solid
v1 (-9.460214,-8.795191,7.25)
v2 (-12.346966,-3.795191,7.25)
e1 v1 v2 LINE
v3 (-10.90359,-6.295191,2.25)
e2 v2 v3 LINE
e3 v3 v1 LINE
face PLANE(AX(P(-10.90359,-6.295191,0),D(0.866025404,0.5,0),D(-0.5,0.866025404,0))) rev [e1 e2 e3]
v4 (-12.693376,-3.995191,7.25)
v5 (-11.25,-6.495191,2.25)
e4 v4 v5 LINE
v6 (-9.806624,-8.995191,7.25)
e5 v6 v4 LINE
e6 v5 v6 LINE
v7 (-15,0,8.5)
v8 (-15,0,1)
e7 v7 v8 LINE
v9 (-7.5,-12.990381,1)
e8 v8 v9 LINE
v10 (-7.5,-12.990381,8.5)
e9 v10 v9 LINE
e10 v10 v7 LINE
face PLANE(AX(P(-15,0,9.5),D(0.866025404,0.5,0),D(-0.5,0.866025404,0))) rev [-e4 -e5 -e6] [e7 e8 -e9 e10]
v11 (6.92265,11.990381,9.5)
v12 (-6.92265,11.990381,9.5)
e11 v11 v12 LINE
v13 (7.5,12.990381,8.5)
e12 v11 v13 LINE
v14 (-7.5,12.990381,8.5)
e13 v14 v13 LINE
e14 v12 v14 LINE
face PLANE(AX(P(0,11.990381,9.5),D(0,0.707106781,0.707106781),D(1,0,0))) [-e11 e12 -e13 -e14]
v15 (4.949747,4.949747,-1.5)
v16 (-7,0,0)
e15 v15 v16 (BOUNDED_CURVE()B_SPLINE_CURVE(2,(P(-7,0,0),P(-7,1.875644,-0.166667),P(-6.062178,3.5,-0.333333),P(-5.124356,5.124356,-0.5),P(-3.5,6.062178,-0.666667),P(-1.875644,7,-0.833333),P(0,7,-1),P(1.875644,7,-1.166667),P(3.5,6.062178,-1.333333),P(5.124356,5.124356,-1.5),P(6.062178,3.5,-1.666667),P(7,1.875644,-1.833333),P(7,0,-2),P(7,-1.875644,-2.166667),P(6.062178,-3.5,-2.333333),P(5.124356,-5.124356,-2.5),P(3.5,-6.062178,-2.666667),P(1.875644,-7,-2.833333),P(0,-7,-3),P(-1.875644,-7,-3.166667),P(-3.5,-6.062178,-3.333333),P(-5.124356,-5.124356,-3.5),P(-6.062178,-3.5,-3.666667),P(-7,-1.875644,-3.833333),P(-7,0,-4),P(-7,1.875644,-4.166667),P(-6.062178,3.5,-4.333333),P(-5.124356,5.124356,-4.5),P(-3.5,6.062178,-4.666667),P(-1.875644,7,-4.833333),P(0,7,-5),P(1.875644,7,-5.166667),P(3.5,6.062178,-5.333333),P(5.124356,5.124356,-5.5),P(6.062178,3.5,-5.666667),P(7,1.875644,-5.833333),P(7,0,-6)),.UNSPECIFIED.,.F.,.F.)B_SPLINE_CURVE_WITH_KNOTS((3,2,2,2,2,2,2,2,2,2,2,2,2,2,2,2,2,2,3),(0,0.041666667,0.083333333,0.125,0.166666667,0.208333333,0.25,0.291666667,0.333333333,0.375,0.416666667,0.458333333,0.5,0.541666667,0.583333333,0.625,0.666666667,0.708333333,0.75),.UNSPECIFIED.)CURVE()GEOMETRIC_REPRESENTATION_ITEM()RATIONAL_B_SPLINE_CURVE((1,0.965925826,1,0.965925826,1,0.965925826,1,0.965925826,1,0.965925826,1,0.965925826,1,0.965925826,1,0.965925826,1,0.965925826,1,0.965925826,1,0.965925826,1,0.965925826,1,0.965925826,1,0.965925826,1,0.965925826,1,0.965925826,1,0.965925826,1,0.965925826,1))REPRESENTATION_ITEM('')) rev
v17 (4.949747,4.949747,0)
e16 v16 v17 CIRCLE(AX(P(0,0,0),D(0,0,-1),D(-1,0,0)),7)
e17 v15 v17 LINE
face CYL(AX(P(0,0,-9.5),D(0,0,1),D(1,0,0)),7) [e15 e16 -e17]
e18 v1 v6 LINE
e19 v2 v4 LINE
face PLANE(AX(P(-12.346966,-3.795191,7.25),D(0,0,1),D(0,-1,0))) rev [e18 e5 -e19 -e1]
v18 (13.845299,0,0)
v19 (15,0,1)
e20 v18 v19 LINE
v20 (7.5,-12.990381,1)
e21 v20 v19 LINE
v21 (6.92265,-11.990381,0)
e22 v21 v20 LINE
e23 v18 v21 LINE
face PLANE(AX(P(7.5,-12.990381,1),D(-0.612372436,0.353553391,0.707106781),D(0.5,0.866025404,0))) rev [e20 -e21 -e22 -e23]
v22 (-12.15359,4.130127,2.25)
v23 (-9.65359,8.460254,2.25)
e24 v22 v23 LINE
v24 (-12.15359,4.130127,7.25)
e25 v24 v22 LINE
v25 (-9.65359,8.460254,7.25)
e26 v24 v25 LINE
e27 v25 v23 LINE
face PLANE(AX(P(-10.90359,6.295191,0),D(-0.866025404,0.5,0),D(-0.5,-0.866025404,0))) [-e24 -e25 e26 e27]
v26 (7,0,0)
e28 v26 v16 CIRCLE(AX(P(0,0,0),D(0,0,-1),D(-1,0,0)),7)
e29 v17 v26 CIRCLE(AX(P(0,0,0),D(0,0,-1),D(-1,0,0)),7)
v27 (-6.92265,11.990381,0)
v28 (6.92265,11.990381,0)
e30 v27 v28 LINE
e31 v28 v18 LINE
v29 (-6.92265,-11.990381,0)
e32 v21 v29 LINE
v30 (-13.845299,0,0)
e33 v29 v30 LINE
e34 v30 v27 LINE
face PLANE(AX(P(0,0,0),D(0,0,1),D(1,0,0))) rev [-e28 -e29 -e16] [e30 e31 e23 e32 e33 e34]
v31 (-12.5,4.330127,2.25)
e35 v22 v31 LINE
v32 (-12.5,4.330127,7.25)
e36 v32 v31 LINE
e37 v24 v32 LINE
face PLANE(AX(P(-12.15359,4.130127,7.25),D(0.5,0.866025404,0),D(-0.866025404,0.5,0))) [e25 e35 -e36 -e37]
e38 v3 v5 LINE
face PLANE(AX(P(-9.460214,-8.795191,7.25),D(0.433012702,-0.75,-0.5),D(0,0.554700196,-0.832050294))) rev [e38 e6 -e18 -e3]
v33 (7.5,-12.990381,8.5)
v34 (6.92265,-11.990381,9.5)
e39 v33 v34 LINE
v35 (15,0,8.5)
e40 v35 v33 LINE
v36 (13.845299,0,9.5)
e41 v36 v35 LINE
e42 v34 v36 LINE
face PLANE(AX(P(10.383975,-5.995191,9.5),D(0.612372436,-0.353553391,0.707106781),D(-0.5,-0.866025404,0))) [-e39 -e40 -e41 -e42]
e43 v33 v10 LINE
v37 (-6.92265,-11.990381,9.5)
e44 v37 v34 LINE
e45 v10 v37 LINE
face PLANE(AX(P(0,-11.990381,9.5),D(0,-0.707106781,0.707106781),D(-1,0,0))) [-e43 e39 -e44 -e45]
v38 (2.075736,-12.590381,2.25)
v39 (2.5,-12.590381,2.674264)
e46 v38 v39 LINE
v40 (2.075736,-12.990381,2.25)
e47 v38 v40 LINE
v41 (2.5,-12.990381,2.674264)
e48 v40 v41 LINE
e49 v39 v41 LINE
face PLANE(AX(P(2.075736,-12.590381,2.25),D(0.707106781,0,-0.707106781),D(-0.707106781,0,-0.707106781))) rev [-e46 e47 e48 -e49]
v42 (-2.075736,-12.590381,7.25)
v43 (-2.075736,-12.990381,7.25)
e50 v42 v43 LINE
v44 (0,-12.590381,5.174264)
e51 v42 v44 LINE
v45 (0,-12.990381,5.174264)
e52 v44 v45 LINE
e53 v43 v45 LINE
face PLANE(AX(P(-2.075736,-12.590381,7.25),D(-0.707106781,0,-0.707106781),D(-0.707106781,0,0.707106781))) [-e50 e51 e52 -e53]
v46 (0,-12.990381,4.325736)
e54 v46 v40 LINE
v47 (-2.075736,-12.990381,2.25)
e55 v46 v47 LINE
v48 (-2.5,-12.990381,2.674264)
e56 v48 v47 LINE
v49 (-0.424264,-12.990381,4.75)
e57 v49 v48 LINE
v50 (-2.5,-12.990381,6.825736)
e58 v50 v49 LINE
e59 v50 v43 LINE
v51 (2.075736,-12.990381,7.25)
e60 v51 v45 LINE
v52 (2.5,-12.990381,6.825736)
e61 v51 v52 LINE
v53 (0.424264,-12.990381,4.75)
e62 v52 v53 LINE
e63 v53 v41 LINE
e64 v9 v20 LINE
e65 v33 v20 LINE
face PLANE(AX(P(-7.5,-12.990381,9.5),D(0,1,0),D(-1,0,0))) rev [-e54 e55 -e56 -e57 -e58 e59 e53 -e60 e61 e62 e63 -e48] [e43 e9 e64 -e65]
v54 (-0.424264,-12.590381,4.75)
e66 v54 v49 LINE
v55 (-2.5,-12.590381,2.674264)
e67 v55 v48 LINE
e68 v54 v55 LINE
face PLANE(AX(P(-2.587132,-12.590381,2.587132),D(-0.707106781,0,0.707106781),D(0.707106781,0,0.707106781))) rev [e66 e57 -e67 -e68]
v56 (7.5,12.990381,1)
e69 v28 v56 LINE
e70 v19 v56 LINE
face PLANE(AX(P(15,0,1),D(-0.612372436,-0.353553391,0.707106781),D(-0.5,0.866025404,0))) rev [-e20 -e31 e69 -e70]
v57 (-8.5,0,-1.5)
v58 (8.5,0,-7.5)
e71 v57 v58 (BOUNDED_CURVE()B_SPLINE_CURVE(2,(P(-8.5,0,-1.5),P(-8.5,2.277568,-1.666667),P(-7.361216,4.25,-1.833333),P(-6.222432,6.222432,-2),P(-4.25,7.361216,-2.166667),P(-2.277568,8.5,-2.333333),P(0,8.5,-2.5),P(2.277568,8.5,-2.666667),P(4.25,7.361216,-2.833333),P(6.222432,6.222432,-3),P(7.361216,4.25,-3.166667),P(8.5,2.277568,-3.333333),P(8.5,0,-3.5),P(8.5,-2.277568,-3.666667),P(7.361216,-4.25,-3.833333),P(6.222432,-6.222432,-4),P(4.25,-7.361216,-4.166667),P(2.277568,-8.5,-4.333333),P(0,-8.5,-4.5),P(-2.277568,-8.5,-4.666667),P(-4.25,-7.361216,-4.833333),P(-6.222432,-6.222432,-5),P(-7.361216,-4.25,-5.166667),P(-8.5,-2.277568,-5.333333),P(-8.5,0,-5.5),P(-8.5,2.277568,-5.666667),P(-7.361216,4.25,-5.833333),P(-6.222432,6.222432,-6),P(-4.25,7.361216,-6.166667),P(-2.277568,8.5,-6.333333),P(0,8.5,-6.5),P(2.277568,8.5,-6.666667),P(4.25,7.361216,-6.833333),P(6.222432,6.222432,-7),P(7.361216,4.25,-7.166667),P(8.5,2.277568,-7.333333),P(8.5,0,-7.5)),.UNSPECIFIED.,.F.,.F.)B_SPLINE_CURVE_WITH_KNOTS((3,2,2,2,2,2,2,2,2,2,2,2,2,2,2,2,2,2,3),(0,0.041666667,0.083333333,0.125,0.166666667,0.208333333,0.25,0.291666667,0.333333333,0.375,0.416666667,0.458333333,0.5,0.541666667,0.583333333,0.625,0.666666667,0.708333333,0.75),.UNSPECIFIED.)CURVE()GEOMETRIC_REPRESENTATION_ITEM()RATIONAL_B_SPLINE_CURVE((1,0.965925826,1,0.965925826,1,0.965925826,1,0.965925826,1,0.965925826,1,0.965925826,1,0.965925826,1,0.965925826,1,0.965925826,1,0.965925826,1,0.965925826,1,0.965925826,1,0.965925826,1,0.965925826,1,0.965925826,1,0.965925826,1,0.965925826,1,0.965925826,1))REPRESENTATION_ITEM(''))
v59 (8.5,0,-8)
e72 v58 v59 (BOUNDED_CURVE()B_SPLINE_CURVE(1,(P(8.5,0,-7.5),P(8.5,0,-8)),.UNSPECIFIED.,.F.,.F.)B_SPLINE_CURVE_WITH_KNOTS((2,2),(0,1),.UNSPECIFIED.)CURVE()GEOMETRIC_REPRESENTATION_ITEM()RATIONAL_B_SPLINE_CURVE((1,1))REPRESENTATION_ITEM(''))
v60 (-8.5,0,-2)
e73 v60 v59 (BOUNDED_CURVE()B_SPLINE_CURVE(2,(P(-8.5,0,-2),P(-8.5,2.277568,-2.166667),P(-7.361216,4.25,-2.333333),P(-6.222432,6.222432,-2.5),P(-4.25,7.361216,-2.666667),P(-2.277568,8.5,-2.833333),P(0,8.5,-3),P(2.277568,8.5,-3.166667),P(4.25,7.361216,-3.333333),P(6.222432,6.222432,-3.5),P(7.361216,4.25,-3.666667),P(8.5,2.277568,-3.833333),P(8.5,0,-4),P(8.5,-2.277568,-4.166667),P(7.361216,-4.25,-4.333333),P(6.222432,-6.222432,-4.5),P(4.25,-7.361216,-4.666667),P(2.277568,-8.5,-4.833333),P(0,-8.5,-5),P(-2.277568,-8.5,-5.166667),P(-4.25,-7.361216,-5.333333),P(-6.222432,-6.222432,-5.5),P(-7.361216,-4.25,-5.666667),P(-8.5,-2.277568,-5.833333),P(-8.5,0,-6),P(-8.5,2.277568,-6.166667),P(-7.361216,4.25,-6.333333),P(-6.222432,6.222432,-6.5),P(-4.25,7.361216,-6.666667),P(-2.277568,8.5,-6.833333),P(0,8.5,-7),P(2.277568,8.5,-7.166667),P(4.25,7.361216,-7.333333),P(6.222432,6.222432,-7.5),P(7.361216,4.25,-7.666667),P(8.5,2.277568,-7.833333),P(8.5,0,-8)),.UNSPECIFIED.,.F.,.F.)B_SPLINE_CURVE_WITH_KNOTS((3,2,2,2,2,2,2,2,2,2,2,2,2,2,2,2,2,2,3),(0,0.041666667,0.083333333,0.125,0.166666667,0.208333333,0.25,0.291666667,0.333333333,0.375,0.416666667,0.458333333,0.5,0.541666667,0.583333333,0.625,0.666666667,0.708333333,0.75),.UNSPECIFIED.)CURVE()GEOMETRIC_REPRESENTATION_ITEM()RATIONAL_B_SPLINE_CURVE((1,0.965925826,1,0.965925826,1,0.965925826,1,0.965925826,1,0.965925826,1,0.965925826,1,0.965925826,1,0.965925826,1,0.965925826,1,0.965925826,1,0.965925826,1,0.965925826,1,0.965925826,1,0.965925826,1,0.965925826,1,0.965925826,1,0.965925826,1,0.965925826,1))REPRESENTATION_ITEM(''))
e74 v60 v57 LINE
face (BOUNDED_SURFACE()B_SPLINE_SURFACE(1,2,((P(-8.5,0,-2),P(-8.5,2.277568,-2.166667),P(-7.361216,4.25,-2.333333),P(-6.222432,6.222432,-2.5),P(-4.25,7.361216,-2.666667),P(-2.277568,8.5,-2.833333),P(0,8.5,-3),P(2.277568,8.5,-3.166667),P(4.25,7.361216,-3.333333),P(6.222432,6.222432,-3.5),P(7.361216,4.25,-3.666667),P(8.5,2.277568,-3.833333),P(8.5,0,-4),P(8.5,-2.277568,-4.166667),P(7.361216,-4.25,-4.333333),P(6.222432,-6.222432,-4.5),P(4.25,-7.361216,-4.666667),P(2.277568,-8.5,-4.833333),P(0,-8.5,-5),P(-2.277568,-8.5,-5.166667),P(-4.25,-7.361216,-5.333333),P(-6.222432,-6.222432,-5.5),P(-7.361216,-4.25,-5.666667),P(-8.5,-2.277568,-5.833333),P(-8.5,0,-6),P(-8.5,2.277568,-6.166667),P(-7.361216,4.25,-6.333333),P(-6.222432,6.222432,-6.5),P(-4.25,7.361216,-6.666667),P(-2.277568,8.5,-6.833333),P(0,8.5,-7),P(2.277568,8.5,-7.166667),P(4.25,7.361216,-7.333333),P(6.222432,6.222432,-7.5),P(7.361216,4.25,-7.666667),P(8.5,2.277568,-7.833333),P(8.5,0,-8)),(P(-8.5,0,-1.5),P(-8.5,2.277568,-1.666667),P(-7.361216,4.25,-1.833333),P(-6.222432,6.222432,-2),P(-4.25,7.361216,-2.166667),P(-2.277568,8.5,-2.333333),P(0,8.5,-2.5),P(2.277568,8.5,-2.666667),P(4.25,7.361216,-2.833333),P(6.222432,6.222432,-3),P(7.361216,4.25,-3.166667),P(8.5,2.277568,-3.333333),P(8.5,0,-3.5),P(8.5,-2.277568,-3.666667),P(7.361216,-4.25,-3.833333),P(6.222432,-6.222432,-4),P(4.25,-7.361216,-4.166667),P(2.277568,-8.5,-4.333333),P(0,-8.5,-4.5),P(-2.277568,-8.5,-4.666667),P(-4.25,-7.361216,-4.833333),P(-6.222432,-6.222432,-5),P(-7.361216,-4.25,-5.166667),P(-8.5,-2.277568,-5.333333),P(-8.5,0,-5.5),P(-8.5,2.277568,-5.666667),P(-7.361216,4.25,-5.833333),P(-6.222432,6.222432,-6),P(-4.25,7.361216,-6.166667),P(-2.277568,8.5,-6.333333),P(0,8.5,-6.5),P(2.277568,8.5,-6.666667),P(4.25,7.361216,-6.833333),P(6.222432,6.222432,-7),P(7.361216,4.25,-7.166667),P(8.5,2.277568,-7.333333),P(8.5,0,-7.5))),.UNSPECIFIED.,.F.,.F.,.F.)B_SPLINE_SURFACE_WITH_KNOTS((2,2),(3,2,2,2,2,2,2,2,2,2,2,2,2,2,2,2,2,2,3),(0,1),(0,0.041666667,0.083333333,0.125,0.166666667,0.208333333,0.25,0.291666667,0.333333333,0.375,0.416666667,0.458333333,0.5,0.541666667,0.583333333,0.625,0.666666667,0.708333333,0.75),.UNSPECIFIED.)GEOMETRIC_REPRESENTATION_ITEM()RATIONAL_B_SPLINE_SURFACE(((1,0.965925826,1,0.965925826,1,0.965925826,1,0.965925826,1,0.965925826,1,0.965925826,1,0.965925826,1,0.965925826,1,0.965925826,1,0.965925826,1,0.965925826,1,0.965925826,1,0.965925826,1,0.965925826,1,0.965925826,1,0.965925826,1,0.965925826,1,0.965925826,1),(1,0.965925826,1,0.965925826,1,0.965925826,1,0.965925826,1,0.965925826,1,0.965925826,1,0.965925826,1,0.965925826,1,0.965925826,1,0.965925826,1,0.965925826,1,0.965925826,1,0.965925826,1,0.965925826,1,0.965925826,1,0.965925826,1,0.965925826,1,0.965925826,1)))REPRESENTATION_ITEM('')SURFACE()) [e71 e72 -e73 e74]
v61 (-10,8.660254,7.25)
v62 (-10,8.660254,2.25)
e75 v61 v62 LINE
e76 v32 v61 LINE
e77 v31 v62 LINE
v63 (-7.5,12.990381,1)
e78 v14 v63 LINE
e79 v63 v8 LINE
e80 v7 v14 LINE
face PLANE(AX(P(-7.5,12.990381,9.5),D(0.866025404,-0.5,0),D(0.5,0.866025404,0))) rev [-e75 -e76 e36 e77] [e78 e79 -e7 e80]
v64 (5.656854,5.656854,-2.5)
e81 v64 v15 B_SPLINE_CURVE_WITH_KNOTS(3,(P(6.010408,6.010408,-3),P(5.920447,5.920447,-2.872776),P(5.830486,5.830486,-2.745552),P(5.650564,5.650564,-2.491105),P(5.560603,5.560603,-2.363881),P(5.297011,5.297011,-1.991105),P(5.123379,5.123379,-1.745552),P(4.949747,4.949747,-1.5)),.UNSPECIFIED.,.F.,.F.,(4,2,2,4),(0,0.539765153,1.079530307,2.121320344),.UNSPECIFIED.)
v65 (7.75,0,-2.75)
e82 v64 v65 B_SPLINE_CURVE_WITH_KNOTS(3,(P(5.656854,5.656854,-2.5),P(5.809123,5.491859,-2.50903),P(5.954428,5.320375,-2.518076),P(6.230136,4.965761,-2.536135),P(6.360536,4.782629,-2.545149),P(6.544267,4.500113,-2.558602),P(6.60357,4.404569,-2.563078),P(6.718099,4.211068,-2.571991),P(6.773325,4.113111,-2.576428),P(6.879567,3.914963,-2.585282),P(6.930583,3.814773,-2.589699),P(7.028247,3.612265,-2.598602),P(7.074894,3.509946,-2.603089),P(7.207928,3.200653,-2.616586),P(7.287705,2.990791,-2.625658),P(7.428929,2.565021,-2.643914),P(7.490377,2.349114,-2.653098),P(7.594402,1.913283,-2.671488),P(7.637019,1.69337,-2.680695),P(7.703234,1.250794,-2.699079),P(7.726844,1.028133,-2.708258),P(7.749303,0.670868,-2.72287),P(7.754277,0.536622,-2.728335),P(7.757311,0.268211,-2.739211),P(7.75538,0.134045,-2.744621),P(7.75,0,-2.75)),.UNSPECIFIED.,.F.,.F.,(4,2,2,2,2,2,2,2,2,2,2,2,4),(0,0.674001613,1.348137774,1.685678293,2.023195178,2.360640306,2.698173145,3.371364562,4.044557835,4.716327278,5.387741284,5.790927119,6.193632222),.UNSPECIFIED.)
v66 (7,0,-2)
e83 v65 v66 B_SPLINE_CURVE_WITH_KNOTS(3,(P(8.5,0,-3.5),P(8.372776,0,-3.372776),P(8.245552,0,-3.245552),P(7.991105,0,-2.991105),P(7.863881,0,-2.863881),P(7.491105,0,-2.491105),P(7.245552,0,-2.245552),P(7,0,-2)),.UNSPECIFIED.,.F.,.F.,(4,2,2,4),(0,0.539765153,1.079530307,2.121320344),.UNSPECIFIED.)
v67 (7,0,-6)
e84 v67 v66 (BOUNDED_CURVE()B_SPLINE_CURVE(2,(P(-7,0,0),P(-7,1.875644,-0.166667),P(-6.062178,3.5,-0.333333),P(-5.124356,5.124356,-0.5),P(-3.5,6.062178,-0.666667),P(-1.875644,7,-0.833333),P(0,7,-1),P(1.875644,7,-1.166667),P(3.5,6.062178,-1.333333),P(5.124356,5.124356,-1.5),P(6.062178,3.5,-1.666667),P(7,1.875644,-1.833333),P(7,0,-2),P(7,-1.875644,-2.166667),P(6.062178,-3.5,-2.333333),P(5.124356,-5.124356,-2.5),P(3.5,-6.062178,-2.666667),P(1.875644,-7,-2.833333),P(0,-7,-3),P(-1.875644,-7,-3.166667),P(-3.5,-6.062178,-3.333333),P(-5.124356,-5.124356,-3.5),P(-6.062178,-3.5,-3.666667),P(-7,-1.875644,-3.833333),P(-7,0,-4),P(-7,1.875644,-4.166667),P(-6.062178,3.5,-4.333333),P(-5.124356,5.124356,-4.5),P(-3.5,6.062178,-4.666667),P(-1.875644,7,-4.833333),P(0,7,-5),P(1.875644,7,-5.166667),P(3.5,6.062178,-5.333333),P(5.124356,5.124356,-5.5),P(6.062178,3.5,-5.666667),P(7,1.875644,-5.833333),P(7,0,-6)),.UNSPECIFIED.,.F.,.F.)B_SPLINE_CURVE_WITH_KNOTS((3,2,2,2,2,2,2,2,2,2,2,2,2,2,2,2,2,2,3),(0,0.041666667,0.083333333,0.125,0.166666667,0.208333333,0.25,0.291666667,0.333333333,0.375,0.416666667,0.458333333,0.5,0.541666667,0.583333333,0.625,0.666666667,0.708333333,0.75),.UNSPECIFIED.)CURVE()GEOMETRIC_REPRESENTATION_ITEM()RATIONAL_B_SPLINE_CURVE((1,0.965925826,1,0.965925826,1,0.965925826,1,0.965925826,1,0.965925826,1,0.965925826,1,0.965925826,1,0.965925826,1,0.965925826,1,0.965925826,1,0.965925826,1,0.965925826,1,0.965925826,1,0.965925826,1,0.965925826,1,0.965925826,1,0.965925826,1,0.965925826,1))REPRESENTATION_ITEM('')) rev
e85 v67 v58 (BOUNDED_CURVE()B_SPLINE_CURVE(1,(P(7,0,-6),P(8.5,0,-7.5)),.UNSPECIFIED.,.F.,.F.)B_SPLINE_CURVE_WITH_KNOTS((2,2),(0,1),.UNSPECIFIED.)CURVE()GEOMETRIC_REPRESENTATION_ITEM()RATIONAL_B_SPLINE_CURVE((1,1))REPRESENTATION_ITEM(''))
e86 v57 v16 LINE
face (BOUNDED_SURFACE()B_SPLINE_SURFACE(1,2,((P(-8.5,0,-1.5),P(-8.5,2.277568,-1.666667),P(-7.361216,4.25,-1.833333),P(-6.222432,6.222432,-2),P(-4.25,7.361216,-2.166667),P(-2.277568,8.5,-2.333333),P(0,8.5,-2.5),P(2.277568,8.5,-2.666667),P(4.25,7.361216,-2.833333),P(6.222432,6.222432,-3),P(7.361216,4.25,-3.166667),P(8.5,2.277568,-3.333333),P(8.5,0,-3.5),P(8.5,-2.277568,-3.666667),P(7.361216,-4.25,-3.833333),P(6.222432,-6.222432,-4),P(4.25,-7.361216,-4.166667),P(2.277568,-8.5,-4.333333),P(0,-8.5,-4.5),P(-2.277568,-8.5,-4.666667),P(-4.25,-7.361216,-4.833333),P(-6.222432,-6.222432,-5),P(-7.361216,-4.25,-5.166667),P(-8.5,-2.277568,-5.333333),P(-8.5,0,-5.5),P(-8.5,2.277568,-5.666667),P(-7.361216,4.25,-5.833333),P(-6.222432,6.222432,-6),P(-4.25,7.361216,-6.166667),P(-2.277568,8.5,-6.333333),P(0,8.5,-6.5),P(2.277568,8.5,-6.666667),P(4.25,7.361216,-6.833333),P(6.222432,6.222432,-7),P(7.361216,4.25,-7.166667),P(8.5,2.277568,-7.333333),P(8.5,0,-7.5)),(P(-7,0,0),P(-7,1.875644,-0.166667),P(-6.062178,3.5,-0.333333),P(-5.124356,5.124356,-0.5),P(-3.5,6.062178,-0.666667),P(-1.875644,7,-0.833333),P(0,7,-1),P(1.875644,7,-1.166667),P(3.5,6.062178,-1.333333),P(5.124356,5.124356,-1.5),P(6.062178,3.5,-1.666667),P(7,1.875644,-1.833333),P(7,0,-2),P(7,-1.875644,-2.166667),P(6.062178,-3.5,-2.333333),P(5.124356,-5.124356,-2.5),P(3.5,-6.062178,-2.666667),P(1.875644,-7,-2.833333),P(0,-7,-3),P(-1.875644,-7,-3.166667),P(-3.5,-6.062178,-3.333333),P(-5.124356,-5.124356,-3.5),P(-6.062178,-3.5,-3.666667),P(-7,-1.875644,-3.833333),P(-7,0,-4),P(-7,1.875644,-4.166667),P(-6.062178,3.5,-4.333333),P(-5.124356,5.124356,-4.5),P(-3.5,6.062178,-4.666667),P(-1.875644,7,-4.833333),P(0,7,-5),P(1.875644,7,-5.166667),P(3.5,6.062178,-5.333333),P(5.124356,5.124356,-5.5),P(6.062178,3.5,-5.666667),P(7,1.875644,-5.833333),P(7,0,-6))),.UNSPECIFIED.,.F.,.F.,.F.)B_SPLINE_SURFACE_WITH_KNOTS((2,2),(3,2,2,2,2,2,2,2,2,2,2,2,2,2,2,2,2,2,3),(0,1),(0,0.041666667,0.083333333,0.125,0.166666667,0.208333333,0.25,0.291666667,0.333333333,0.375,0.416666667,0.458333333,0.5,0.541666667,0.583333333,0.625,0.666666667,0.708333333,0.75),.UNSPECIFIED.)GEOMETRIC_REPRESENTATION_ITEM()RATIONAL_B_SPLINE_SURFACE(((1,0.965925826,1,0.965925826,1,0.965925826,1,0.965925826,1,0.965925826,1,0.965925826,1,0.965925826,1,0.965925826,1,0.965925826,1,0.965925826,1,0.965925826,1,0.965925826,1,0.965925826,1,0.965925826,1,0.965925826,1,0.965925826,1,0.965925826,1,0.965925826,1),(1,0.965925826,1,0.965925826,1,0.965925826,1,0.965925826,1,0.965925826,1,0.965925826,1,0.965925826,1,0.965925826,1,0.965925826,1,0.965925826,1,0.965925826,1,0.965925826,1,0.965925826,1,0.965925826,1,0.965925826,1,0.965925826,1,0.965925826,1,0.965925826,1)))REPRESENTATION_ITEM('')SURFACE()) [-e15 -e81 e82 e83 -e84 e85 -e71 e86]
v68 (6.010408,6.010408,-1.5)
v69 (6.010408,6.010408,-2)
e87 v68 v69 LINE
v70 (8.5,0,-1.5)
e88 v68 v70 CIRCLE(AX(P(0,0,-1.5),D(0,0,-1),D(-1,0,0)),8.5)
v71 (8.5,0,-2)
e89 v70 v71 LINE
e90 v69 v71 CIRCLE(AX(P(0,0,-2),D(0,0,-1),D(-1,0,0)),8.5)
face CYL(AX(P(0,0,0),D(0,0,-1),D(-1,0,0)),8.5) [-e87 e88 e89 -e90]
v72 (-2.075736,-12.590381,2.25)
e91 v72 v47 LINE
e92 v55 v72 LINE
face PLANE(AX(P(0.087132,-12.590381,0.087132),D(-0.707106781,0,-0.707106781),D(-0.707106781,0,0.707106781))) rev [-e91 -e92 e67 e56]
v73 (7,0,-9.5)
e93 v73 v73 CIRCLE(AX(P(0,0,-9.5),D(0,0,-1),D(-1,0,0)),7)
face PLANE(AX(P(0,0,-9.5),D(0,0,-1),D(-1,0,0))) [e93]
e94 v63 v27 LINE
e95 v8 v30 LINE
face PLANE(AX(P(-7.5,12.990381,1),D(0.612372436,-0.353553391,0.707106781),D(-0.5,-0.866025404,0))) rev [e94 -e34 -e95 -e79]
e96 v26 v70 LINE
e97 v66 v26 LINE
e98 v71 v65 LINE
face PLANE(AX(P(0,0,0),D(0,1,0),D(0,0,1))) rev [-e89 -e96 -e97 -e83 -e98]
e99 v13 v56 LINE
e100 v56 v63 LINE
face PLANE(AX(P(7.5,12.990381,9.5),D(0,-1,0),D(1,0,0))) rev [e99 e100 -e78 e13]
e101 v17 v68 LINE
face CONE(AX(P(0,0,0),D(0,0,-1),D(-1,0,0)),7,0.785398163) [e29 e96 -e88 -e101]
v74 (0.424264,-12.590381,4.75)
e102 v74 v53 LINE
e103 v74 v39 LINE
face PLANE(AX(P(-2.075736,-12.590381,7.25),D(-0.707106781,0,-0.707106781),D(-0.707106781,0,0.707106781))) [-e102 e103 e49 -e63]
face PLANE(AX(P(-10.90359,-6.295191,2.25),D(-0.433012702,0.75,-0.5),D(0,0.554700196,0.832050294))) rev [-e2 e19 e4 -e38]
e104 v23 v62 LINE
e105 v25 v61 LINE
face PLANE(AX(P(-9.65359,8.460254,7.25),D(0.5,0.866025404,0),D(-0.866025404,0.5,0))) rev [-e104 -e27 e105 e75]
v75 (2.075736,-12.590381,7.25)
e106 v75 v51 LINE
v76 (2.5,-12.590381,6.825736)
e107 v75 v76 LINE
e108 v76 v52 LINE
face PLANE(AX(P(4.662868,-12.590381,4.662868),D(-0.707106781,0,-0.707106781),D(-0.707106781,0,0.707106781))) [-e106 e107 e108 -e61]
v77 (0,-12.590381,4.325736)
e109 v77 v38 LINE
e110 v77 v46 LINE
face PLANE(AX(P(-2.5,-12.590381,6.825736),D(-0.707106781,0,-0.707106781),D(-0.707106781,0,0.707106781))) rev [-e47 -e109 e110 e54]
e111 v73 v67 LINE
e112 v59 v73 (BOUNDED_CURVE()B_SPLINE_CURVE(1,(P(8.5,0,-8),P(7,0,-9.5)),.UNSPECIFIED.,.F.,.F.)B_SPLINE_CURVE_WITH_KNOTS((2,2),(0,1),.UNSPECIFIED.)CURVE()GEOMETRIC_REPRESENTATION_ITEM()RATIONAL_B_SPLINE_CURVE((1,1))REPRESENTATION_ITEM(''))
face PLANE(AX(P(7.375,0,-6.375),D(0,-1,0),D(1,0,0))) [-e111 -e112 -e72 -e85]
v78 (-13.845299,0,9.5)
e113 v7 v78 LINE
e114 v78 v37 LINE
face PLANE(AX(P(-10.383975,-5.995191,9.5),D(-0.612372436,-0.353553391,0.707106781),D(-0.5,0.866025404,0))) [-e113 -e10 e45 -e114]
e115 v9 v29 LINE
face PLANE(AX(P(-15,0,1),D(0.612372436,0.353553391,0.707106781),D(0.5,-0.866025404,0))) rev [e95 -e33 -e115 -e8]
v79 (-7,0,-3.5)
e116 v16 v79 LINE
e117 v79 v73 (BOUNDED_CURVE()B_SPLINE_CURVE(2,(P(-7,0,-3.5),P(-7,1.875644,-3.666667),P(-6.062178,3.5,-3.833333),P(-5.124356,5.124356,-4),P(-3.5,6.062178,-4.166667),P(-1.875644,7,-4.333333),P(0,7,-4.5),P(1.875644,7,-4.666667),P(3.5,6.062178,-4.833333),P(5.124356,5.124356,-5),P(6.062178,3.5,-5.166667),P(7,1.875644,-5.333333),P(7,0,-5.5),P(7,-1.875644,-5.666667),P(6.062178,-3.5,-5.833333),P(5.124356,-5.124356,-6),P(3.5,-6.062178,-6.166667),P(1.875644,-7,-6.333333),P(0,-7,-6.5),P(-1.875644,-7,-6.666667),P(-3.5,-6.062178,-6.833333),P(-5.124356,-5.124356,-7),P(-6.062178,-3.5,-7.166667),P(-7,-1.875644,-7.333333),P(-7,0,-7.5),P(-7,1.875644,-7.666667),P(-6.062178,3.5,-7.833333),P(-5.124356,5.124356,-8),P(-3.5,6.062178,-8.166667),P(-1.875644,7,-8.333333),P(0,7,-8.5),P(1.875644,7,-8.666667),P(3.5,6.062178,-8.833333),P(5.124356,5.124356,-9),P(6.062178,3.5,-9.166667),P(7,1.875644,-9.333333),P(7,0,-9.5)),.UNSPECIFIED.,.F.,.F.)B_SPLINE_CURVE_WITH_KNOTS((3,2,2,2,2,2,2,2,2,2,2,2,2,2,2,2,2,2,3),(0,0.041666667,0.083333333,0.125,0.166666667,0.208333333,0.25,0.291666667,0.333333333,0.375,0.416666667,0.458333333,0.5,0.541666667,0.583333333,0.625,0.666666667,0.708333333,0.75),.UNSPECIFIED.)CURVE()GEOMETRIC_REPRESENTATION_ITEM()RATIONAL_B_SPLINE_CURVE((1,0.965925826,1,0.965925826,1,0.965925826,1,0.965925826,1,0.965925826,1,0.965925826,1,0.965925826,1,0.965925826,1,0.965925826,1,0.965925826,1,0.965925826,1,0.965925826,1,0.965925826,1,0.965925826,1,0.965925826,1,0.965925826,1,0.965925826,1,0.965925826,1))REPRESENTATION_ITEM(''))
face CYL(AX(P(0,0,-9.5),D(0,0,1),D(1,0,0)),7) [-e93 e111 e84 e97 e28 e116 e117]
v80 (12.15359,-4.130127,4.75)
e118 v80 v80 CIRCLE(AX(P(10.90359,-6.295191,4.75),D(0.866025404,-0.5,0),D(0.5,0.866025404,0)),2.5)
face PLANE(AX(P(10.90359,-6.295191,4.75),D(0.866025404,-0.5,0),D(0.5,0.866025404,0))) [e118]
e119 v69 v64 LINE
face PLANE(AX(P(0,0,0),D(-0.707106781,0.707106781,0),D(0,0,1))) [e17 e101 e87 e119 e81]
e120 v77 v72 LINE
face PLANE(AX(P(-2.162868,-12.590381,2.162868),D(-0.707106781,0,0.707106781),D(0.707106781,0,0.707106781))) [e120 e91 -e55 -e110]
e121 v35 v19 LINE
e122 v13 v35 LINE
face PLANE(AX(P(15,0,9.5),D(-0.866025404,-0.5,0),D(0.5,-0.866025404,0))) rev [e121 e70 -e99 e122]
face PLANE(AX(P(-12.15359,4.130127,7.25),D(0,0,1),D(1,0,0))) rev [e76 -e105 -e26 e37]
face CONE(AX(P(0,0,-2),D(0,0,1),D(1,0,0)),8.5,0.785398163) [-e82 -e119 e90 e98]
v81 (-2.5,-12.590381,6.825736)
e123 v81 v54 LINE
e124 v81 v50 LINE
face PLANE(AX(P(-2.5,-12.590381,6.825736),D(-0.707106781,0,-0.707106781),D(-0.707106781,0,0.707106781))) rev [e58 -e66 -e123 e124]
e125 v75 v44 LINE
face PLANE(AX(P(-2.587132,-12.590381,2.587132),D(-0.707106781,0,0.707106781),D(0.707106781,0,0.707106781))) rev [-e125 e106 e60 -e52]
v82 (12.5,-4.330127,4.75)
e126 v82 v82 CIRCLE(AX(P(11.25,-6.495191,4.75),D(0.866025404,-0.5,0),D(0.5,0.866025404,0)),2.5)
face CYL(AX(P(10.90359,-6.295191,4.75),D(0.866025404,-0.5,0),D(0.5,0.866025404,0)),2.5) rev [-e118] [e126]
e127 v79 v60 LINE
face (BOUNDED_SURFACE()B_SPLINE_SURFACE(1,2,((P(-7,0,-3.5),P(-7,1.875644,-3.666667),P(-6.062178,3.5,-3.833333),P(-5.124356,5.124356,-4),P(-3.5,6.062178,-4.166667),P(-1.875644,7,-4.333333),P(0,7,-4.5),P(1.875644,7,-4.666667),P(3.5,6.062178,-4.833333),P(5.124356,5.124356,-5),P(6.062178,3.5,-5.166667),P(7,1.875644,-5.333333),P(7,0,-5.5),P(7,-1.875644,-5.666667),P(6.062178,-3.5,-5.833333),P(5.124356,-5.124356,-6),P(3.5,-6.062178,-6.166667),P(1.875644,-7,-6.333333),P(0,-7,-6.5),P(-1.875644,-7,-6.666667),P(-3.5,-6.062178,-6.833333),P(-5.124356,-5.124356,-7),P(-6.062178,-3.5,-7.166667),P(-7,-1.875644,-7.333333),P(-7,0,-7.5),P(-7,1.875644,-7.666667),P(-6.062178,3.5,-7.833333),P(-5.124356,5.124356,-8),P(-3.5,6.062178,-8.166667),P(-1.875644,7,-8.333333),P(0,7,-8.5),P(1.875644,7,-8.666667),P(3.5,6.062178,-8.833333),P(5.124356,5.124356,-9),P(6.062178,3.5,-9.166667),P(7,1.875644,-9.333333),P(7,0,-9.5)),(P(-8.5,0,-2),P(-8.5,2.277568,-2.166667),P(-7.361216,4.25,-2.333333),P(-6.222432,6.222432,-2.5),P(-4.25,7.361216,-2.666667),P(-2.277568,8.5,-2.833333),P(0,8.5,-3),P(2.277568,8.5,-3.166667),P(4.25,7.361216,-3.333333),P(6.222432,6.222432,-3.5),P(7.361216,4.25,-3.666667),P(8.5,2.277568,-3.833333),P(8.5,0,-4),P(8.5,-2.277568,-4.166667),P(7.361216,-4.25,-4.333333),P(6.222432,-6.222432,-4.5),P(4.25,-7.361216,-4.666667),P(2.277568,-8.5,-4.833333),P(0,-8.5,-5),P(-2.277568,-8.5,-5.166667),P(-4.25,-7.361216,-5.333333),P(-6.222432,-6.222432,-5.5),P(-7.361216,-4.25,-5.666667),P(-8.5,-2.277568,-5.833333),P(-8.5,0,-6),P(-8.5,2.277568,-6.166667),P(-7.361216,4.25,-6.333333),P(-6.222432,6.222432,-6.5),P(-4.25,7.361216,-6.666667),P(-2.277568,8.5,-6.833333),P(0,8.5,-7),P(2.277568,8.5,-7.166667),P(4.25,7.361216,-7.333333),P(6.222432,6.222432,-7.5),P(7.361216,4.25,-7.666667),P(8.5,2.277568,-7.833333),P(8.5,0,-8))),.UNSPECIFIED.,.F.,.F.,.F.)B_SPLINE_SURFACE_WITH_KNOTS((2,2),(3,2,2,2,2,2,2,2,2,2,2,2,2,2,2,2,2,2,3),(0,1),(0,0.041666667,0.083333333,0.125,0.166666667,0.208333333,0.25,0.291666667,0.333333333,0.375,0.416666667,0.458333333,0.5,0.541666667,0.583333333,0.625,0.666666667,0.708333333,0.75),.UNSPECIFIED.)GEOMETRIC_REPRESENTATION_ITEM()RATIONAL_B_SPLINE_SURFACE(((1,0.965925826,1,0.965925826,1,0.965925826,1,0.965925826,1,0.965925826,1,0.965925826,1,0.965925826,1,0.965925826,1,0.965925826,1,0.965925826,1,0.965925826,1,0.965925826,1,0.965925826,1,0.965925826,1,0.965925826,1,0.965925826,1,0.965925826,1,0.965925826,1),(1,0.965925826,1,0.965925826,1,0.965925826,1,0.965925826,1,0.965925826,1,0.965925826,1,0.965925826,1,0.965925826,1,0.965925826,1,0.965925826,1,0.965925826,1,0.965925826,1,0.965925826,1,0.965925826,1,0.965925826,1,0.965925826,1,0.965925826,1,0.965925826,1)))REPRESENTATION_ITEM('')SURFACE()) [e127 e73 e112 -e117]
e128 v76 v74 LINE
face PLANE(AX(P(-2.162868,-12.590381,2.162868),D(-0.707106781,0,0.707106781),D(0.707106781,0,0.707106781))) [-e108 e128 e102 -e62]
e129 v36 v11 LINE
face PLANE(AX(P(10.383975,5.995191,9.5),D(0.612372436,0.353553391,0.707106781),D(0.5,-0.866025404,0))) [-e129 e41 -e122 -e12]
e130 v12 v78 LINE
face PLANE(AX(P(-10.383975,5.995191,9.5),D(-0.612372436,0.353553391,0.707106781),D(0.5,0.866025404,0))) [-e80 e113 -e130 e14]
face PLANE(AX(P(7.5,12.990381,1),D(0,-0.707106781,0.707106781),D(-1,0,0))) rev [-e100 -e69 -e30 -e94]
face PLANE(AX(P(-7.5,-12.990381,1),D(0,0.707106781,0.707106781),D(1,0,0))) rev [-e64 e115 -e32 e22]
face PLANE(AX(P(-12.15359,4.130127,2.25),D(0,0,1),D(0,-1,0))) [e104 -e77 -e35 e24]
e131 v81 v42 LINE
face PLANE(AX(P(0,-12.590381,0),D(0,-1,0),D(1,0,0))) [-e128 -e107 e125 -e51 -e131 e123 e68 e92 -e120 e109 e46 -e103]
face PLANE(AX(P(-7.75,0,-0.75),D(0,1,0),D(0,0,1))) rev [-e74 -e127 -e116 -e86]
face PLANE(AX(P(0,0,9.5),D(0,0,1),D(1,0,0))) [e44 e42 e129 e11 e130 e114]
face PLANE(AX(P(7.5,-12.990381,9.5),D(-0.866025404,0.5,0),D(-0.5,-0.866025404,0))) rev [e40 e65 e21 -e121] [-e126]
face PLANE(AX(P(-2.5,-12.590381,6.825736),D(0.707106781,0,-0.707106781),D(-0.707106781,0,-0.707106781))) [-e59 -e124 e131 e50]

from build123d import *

# Parameters (mm, degrees)
EXTRUDE_1_DEPTH     = 9.5
SKETCH_6_R          = 7
EXTRUDE_2_DEPTH     = 9.5
SWEEP_1_PITCH       = 4
REVOLVE_2_ANGLE     = 45
CHAMFER_1_SIZE      = 1
CUT_EXTRUDE_2_DEPTH = 0.4
SKETCH_13_R         = 2.5
CUT_EXTRUDE_3_DEPTH = 0.4
CUT_EXTRUDE_4_DEPTH = 0.4
SKETCH_14_W         = 5
SKETCH_14_H         = 5
CUT_EXTRUDE_5_DEPTH = 0.4


with BuildPart() as part:
    # 草图1 → 凸台-拉伸1 (new body)
    with BuildSketch(Plane.XY):
        Polygon((15, 0), (7.5, 12.990381057), (-7.5, 12.990381057), (-15, 0), (-7.5, -12.990381057), (7.5, -12.990381057), align=None)
    extrude(amount=EXTRUDE_1_DEPTH)

    # 草图6 → 凸台-拉伸2 (add)
    with BuildSketch(Plane(origin=(0, 0, 0), x_dir=(-1, 0, 0), z_dir=(0, 0, -1))):
        Circle(SKETCH_6_R)
    extrude(amount=EXTRUDE_2_DEPTH)

    # 扫描1: the profile of 草图8 profile screwed along a right-hand helix of 1.5 turns, 12 arcs to a turn; built about Z, then put on its axis
    sweep_1_z = Axis((0, 0, 0), (0, 0, 1))
    sweep_1_corners = [(6.9997, 0, 1.7503), (6.9997, 0, -1.7503), (8.5, 0, -0.25), (8.5, 0, 0.25)]
    with BuildLine(mode=Mode.PRIVATE) as sweep_1_profile:
        Line(sweep_1_corners[0], sweep_1_corners[1])
        Line(sweep_1_corners[1], sweep_1_corners[2])
        Line(sweep_1_corners[2], sweep_1_corners[3])
        Line(sweep_1_corners[3], sweep_1_corners[0])
    sweep_1_cap = Face(sweep_1_profile.wire())
    sweep_1_turn_angles = [0, 15, 30, 45, 60, 75, 90, 105, 120, 135, 150, 165, 180, 195, 210, 225, 240, 255, 270, 285, 300, 315, 330, 345, 360]
    sweep_1_turn_weights = [1, 0.9659258262890683, 1, 0.9659258262890683, 1, 0.9659258262890683, 1, 0.9659258262890683, 1, 0.9659258262890683, 1, 0.9659258262890683, 1, 0.9659258262890683, 1, 0.9659258262890683, 1, 0.9659258262890683, 1, 0.9659258262890683, 1, 0.9659258262890683, 1, 0.9659258262890683, 1]
    sweep_1_turn_rails = [Edge.make_bspline([Vector(p[0], p[1], 0).rotate(sweep_1_z, sweep_1_turn_angles[k]) / sweep_1_turn_weights[k] + Vector(0, 0, p[2] + SWEEP_1_PITCH * sweep_1_turn_angles[k] / 360) for k in range(25)], [0, 0, 0, 1, 1, 2, 2, 3, 3, 4, 4, 5, 5, 6, 6, 7, 7, 8, 8, 9, 9, 10, 10, 11, 11, 12, 12, 12], 2, sweep_1_turn_weights) for p in sweep_1_corners]
    sweep_1_turn_sides = [Face.make_surface_from_curves(sweep_1_turn_rails[p[0]], sweep_1_turn_rails[p[1]]) for p in [(0, 1), (1, 2), (2, 3), (3, 0)]]
    sweep_1_last_angles = [360, 375, 390, 405, 420, 435, 450, 465, 480, 495, 510, 525, 540]
    sweep_1_last_weights = [1, 0.9659258262890683, 1, 0.9659258262890683, 1, 0.9659258262890683, 1, 0.9659258262890683, 1, 0.9659258262890683, 1, 0.965925826289066, 1]
    sweep_1_last_rails = [Edge.make_bspline([Vector(p[0], p[1], 0).rotate(sweep_1_z, sweep_1_last_angles[k]) / sweep_1_last_weights[k] + Vector(0, 0, p[2] + SWEEP_1_PITCH * sweep_1_last_angles[k] / 360) for k in range(13)], [0, 0, 0, 1, 1, 2, 2, 3, 3, 4, 4, 5, 5, 6, 6, 6], 2, sweep_1_last_weights) for p in sweep_1_corners]
    sweep_1_last_sides = [Face.make_surface_from_curves(sweep_1_last_rails[p[0]], sweep_1_last_rails[p[1]]) for p in [(0, 1), (1, 2), (2, 3), (3, 0)]]
    sweep_1 = Plane(origin=(0, 0, -1.75), x_dir=(-1, 0, 0), z_dir=(0, 0, -1)) * Solid(Shell([*sweep_1_turn_sides, *sweep_1_last_sides, sweep_1_cap, sweep_1_cap.rotate(sweep_1_z, 540).moved(Location((0, 0, SWEEP_1_PITCH * 540 / 360)))]))
    add(sweep_1)

    # 草图9 → 旋转2 (revolve)
    with BuildSketch(Plane(origin=(0, 0, 0), x_dir=(1, 0, 0), z_dir=(0, 1, 0))):
        Polygon((7, 3.5), (7, 0), (8.5, 1.5), (8.5, 2), align=None)
    revolve(axis=Axis((0, 0, 0), (0, 0, 1)), revolution_arc=REVOLVE_2_ANGLE)

    # 倒角1
    chamfer_1_edges = [part.edges().sort_by_distance(p)[0] for p in [
        (-11.25, 6.495190528, 9.5),
        (-11.25, -6.495190528, 9.5),
        (0, -12.990381057, 9.5),
        (11.25, -6.495190528, 9.5),
        (11.25, 6.495190528, 9.5),
        (11.25, -6.495190528, 0),
        (0, -12.990381057, 0),
        (-11.25, -6.495190528, 0),
        (-11.25, 6.495190528, 0),
        (0, 12.990381057, 0),
        (11.25, 6.495190528, 0),
        (0, 12.990381057, 9.5),
    ]]
    chamfer(chamfer_1_edges, length=CHAMFER_1_SIZE)

    # 草图11 → 切除-拉伸2 (cut)
    with BuildSketch(Plane(origin=(-11.25, -6.495190528, 0), x_dir=(0, 0, 1), z_dir=(-0.8660254037844389, -0.4999999999999995, 0))):
        Polygon((2.25, 0), (7.25, 2.886751346), (7.25, -2.886751346), align=None)
    extrude(amount=-CUT_EXTRUDE_2_DEPTH, mode=Mode.SUBTRACT)

    # 草图13 → 切除-拉伸3 (cut)
    with BuildSketch(Plane(origin=(11.25, -6.495190528, 0), x_dir=(0, 0, -1), z_dir=(0.8660254037844387, -0.5000000000000001, 0))):
        with Locations(Location((-4.75, 0, 0), (0, 0, 90))):
            Circle(SKETCH_13_R)
    extrude(amount=-CUT_EXTRUDE_3_DEPTH, mode=Mode.SUBTRACT)

    # 草图12 → 切除-拉伸4 (cut)
    with BuildSketch(Plane.XZ.offset(12.990381057)):
        Polygon((-2.5, 6.825735931), (2.075735931, 2.25), (2.5, 2.674264069), (-2.075735931, 7.25), align=None)
        Polygon((2.075735931, 7.25), (-2.5, 2.674264069), (-2.075735931, 2.25), (2.5, 6.825735931), align=None)
    extrude(amount=-CUT_EXTRUDE_4_DEPTH, mode=Mode.SUBTRACT)

    # 草图14 → 切除-拉伸5 (cut)
    with BuildSketch(Plane(origin=(-11.25, 6.495190528, 0), x_dir=(0, 0, 1), z_dir=(-0.8660254037844384, 0.5000000000000006, 0))):
        with Locations((4.75, 0)):
            Rectangle(SKETCH_14_W, SKETCH_14_H)
    extrude(amount=-CUT_EXTRUDE_5_DEPTH, mode=Mode.SUBTRACT)


solid = part.part
